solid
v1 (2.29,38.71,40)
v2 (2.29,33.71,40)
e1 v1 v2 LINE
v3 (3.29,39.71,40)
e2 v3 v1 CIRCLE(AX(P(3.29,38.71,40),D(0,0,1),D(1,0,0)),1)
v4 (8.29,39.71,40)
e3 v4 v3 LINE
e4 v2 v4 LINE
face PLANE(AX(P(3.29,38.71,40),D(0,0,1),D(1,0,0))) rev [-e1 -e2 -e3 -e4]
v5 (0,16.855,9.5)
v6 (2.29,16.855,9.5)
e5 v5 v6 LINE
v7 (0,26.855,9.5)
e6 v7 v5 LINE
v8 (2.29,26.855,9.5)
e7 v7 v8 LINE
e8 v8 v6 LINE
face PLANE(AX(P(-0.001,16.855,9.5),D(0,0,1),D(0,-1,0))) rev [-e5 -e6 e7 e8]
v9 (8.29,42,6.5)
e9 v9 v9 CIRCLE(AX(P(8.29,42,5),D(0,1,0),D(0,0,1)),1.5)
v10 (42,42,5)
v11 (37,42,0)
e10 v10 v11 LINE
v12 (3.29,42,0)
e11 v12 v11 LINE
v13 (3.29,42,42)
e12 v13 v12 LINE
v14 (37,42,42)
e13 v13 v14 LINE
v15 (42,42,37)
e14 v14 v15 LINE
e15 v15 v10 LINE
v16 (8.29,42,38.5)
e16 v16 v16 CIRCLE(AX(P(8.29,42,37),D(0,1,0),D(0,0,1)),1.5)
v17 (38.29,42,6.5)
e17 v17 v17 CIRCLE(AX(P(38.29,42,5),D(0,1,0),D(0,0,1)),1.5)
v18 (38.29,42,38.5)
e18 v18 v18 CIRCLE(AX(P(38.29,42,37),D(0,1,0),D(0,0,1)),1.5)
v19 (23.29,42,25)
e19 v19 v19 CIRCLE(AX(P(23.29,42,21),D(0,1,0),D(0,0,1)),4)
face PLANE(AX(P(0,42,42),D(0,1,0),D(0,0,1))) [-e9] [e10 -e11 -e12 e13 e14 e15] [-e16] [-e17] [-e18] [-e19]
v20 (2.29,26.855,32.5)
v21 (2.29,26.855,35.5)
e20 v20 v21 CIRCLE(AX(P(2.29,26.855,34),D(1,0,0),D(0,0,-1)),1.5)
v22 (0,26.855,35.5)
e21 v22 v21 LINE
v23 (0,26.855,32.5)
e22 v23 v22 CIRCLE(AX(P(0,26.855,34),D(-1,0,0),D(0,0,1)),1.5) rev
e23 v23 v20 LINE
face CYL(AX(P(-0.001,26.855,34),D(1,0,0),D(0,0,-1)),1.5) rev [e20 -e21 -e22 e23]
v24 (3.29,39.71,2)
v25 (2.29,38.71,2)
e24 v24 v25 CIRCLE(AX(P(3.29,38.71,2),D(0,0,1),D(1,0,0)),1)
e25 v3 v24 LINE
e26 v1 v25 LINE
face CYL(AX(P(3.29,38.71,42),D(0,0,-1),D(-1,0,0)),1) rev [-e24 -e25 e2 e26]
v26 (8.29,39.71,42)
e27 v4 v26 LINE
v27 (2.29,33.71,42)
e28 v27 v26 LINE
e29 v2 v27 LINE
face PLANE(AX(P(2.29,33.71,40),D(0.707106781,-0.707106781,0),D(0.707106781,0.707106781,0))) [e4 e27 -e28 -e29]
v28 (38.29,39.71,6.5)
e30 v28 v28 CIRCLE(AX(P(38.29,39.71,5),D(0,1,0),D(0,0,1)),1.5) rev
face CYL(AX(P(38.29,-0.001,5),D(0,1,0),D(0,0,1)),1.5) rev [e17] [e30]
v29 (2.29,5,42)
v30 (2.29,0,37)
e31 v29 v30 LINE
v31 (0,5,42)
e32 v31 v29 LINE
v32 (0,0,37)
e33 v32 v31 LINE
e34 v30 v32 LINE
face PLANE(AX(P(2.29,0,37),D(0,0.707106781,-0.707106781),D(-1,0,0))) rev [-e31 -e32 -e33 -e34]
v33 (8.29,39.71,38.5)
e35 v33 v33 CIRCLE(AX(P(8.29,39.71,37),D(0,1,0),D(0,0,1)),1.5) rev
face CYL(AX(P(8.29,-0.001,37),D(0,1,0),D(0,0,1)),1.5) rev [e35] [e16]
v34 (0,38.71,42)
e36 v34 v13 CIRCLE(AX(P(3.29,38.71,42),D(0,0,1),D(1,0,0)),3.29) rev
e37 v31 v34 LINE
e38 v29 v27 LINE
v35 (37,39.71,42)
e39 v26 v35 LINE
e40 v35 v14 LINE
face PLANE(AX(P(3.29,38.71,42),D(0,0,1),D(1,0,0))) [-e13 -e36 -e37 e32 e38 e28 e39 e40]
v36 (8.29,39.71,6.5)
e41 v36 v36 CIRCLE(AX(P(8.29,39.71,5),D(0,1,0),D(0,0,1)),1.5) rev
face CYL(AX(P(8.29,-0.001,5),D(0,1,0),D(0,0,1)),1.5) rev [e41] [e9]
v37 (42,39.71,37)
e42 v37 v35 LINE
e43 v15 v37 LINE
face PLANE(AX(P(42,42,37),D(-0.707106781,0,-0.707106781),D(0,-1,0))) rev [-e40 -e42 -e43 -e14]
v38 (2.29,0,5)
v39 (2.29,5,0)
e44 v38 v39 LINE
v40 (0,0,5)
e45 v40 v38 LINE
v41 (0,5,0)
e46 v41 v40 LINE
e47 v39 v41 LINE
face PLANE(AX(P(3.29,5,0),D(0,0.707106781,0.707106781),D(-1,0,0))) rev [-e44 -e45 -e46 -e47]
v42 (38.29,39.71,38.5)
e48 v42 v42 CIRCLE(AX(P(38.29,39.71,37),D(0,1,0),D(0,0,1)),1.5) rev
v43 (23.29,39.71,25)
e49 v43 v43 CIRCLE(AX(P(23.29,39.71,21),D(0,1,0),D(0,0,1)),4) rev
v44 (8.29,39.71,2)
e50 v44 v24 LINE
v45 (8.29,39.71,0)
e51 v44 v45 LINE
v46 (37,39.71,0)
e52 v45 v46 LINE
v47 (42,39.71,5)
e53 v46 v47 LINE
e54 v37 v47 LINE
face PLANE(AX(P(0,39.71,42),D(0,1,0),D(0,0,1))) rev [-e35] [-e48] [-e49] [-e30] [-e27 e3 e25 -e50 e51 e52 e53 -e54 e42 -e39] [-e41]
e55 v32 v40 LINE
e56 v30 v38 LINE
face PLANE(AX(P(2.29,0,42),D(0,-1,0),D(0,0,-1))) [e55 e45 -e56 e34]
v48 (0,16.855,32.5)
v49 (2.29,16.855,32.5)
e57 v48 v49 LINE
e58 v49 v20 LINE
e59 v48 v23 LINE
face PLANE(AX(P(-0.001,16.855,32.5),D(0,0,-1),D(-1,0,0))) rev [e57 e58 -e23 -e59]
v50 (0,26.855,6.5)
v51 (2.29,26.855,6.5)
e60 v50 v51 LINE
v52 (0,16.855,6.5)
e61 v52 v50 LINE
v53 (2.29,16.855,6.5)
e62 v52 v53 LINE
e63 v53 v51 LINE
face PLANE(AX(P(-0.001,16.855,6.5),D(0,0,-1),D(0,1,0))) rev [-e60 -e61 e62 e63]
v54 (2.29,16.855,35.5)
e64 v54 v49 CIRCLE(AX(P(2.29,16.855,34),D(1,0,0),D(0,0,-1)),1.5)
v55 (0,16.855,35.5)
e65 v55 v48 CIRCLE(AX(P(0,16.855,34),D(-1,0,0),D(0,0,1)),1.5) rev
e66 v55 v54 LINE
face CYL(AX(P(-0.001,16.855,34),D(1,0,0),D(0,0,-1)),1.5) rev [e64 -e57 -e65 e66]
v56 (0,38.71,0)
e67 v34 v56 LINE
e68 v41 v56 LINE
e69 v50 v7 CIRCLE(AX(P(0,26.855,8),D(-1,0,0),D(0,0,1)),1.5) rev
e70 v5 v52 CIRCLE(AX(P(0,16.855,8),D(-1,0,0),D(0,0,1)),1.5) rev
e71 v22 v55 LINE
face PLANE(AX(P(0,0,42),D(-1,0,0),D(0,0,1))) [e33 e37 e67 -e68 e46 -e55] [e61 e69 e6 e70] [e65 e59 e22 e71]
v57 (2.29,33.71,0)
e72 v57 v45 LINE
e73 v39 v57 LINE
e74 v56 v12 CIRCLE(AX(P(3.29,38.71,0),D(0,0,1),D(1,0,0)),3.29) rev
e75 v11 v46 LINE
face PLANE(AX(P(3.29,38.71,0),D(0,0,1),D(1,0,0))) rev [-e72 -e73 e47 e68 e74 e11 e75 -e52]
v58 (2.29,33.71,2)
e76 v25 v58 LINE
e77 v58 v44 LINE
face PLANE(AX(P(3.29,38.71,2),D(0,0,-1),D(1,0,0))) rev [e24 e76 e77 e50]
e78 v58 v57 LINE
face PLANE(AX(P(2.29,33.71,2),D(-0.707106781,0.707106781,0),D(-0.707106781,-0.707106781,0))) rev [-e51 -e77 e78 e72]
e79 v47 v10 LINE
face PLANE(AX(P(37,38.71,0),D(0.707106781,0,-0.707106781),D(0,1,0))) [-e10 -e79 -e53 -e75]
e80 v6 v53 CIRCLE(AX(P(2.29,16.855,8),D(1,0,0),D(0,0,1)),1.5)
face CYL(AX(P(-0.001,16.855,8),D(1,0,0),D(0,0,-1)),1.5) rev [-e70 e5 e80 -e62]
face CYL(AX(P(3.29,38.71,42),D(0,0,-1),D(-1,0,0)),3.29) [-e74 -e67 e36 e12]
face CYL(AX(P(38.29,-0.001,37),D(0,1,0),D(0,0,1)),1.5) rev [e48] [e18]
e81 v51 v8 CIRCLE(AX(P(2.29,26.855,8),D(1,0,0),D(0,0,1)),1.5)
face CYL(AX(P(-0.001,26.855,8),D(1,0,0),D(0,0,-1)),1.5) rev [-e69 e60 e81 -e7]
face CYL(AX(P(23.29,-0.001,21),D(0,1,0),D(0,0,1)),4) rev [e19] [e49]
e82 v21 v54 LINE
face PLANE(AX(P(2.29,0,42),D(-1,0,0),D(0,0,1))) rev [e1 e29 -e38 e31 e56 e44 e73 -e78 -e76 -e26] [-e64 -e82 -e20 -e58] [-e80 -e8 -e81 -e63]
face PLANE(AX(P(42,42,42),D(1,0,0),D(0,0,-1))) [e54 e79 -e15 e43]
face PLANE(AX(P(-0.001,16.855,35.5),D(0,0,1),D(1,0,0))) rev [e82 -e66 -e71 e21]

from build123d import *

# Parameters (mm, degrees)
BRIDA_BASE1_DEPTH       = 42
CHAFL_N1_SIZE           = 5
CORTAR_EXTRUIR1_REACH   = 74.746
CROQUIS6_R              = 1.5
CROQUIS6_R_2            = 4
CORTAR_EXTRUIR2_REACH   = 73.448
SALIENTE_EXTRUIR1_START = -2
SALIENTE_EXTRUIR1_DEPTH = 2


# Sheet-metal steps are written as plain solids
with BuildPart() as part:
    # Croquis1 → Brida base1 (new body)
    with BuildSketch(Plane.XY):
        with BuildLine():
            Line((0, 0), (0, 38.71))
            ThreePointArc((0, 38.71), (0.96361869, 41.03638131), (3.29, 42))
            Line((3.29, 42), (42, 42))
            Line((42, 42), (42, 39.71))
            Line((42, 39.71), (3.29, 39.71))
            ThreePointArc((3.29, 39.71), (2.582893219, 39.417106781), (2.29, 38.71))
            Line((2.29, 38.71), (2.29, 0))
            Line((2.29, 0), (0, 0))
        make_face()
    extrude(amount=BRIDA_BASE1_DEPTH)

    # Chaflán1
    chafl_n1_edges = [part.edges().sort_by_distance(p)[0] for p in [
        (1.145, 0, 42),
        (1.145, 0, 0),
        (42, 40.855, 42),
        (42, 40.855, 0),
    ]]
    chamfer(chafl_n1_edges, length=CHAFL_N1_SIZE)

    # Croquis6 → Cortar-Extruir1 (cut, up to next)
    with BuildSketch(Plane(origin=(0, 42, 0), x_dir=(1, 0, 0), z_dir=(0, 1, 0)), mode=Mode.PRIVATE) as cortar_extruir1_sk1:
        with Locations(Location((8.29, -5, 0), (0, 0, 270))):
            Circle(CROQUIS6_R)
    cortar_extruir1_tool1 = extrude(cortar_extruir1_sk1.sketch, amount=-CORTAR_EXTRUIR1_REACH, mode=Mode.PRIVATE) & part.part
    # Croquis6 → Cortar-Extruir1 (cut, up to next)
    with BuildSketch(Plane(origin=(0, 42, 0), x_dir=(1, 0, 0), z_dir=(0, 1, 0)), mode=Mode.PRIVATE) as cortar_extruir1_sk2:
        with Locations(Location((38.29, -5, 0), (0, 0, 270))):
            Circle(CROQUIS6_R)
    cortar_extruir1_tool2 = extrude(cortar_extruir1_sk2.sketch, amount=-CORTAR_EXTRUIR1_REACH, mode=Mode.PRIVATE) & part.part
    # Croquis6 → Cortar-Extruir1 (cut, up to next)
    with BuildSketch(Plane(origin=(0, 42, 0), x_dir=(1, 0, 0), z_dir=(0, 1, 0)), mode=Mode.PRIVATE) as cortar_extruir1_sk3:
        with Locations(Location((38.29, -37, 0), (0, 0, 270))):
            Circle(CROQUIS6_R)
    cortar_extruir1_tool3 = extrude(cortar_extruir1_sk3.sketch, amount=-CORTAR_EXTRUIR1_REACH, mode=Mode.PRIVATE) & part.part
    # Croquis6 → Cortar-Extruir1 (cut, up to next)
    with BuildSketch(Plane(origin=(0, 42, 0), x_dir=(1, 0, 0), z_dir=(0, 1, 0)), mode=Mode.PRIVATE) as cortar_extruir1_sk4:
        with Locations(Location((8.29, -37, 0), (0, 0, 270))):
            Circle(CROQUIS6_R)
    cortar_extruir1_tool4 = extrude(cortar_extruir1_sk4.sketch, amount=-CORTAR_EXTRUIR1_REACH, mode=Mode.PRIVATE) & part.part
    # Croquis6 → Cortar-Extruir1 (cut, up to next)
    with BuildSketch(Plane(origin=(0, 42, 0), x_dir=(1, 0, 0), z_dir=(0, 1, 0)), mode=Mode.PRIVATE) as cortar_extruir1_sk5:
        with Locations(Location((23.29, -21, 0), (0, 0, 270))):
            Circle(CROQUIS6_R_2)
    cortar_extruir1_tool5 = extrude(cortar_extruir1_sk5.sketch, amount=-CORTAR_EXTRUIR1_REACH, mode=Mode.PRIVATE) & part.part
    add(cortar_extruir1_tool1.solids().sort_by_distance((8.29, 42, 5))[0], mode=Mode.SUBTRACT)
    add(cortar_extruir1_tool2.solids().sort_by_distance((38.29, 42, 5))[0], mode=Mode.SUBTRACT)
    add(cortar_extruir1_tool3.solids().sort_by_distance((38.29, 42, 37))[0], mode=Mode.SUBTRACT)
    add(cortar_extruir1_tool4.solids().sort_by_distance((8.29, 42, 37))[0], mode=Mode.SUBTRACT)
    add(cortar_extruir1_tool5.solids().sort_by_distance((23.29, 42, 21))[0], mode=Mode.SUBTRACT)

    # Croquis7 → Cortar-Extruir2 (cut, up to next)
    with BuildSketch(Plane(origin=(2.29, 0, 0), x_dir=(0, 0, -1), z_dir=(1, 0, 0)), mode=Mode.PRIVATE) as cortar_extruir2_sk1:
        with BuildLine():
            Line((-35.5, 16.855), (-35.5, 26.855))
            ThreePointArc((-35.5, 26.855), (-34, 28.355), (-32.5, 26.855))
            Line((-32.5, 26.855), (-32.5, 16.855))
            ThreePointArc((-32.5, 16.855), (-34, 15.355), (-35.5, 16.855))
        make_face()
    cortar_extruir2_tool1 = extrude(cortar_extruir2_sk1.sketch, amount=-CORTAR_EXTRUIR2_REACH, mode=Mode.PRIVATE) & part.part
    # Croquis7 → Cortar-Extruir2 (cut, up to next)
    with BuildSketch(Plane(origin=(2.29, 0, 0), x_dir=(0, 0, -1), z_dir=(1, 0, 0)), mode=Mode.PRIVATE) as cortar_extruir2_sk2:
        with BuildLine():
            Line((-6.5, 16.855), (-6.5, 26.855))
            ThreePointArc((-6.5, 26.855), (-8, 28.355), (-9.5, 26.855))
            Line((-9.5, 26.855), (-9.5, 16.855))
            ThreePointArc((-9.5, 16.855), (-8, 15.355), (-6.5, 16.855))
        make_face()
    cortar_extruir2_tool2 = extrude(cortar_extruir2_sk2.sketch, amount=-CORTAR_EXTRUIR2_REACH, mode=Mode.PRIVATE) & part.part
    add(cortar_extruir2_tool1.solids().sort_by_distance((2.29, 21.855, 34))[0], mode=Mode.SUBTRACT)
    add(cortar_extruir2_tool2.solids().sort_by_distance((2.29, 21.855, 8))[0], mode=Mode.SUBTRACT)

    # Croquis9 → Saliente-Extruir1 (add)
    with BuildSketch(Plane.XY.offset(42).offset(SALIENTE_EXTRUIR1_START)):
        with BuildLine():
            Line((2.29, 38.71), (2.29, 33.71))
            Line((2.29, 33.71), (8.29, 39.71))
            Line((8.29, 39.71), (3.29, 39.71))
            ThreePointArc((3.29, 39.71), (2.582893219, 39.417106781), (2.29, 38.71))
        make_face()
    saliente_extruir1 = extrude(amount=SALIENTE_EXTRUIR1_DEPTH)

    # Simetría1: Saliente-Extruir1 across plane
    add(saliente_extruir1.mirror(Plane.XY.offset(21)))


solid = part.part
